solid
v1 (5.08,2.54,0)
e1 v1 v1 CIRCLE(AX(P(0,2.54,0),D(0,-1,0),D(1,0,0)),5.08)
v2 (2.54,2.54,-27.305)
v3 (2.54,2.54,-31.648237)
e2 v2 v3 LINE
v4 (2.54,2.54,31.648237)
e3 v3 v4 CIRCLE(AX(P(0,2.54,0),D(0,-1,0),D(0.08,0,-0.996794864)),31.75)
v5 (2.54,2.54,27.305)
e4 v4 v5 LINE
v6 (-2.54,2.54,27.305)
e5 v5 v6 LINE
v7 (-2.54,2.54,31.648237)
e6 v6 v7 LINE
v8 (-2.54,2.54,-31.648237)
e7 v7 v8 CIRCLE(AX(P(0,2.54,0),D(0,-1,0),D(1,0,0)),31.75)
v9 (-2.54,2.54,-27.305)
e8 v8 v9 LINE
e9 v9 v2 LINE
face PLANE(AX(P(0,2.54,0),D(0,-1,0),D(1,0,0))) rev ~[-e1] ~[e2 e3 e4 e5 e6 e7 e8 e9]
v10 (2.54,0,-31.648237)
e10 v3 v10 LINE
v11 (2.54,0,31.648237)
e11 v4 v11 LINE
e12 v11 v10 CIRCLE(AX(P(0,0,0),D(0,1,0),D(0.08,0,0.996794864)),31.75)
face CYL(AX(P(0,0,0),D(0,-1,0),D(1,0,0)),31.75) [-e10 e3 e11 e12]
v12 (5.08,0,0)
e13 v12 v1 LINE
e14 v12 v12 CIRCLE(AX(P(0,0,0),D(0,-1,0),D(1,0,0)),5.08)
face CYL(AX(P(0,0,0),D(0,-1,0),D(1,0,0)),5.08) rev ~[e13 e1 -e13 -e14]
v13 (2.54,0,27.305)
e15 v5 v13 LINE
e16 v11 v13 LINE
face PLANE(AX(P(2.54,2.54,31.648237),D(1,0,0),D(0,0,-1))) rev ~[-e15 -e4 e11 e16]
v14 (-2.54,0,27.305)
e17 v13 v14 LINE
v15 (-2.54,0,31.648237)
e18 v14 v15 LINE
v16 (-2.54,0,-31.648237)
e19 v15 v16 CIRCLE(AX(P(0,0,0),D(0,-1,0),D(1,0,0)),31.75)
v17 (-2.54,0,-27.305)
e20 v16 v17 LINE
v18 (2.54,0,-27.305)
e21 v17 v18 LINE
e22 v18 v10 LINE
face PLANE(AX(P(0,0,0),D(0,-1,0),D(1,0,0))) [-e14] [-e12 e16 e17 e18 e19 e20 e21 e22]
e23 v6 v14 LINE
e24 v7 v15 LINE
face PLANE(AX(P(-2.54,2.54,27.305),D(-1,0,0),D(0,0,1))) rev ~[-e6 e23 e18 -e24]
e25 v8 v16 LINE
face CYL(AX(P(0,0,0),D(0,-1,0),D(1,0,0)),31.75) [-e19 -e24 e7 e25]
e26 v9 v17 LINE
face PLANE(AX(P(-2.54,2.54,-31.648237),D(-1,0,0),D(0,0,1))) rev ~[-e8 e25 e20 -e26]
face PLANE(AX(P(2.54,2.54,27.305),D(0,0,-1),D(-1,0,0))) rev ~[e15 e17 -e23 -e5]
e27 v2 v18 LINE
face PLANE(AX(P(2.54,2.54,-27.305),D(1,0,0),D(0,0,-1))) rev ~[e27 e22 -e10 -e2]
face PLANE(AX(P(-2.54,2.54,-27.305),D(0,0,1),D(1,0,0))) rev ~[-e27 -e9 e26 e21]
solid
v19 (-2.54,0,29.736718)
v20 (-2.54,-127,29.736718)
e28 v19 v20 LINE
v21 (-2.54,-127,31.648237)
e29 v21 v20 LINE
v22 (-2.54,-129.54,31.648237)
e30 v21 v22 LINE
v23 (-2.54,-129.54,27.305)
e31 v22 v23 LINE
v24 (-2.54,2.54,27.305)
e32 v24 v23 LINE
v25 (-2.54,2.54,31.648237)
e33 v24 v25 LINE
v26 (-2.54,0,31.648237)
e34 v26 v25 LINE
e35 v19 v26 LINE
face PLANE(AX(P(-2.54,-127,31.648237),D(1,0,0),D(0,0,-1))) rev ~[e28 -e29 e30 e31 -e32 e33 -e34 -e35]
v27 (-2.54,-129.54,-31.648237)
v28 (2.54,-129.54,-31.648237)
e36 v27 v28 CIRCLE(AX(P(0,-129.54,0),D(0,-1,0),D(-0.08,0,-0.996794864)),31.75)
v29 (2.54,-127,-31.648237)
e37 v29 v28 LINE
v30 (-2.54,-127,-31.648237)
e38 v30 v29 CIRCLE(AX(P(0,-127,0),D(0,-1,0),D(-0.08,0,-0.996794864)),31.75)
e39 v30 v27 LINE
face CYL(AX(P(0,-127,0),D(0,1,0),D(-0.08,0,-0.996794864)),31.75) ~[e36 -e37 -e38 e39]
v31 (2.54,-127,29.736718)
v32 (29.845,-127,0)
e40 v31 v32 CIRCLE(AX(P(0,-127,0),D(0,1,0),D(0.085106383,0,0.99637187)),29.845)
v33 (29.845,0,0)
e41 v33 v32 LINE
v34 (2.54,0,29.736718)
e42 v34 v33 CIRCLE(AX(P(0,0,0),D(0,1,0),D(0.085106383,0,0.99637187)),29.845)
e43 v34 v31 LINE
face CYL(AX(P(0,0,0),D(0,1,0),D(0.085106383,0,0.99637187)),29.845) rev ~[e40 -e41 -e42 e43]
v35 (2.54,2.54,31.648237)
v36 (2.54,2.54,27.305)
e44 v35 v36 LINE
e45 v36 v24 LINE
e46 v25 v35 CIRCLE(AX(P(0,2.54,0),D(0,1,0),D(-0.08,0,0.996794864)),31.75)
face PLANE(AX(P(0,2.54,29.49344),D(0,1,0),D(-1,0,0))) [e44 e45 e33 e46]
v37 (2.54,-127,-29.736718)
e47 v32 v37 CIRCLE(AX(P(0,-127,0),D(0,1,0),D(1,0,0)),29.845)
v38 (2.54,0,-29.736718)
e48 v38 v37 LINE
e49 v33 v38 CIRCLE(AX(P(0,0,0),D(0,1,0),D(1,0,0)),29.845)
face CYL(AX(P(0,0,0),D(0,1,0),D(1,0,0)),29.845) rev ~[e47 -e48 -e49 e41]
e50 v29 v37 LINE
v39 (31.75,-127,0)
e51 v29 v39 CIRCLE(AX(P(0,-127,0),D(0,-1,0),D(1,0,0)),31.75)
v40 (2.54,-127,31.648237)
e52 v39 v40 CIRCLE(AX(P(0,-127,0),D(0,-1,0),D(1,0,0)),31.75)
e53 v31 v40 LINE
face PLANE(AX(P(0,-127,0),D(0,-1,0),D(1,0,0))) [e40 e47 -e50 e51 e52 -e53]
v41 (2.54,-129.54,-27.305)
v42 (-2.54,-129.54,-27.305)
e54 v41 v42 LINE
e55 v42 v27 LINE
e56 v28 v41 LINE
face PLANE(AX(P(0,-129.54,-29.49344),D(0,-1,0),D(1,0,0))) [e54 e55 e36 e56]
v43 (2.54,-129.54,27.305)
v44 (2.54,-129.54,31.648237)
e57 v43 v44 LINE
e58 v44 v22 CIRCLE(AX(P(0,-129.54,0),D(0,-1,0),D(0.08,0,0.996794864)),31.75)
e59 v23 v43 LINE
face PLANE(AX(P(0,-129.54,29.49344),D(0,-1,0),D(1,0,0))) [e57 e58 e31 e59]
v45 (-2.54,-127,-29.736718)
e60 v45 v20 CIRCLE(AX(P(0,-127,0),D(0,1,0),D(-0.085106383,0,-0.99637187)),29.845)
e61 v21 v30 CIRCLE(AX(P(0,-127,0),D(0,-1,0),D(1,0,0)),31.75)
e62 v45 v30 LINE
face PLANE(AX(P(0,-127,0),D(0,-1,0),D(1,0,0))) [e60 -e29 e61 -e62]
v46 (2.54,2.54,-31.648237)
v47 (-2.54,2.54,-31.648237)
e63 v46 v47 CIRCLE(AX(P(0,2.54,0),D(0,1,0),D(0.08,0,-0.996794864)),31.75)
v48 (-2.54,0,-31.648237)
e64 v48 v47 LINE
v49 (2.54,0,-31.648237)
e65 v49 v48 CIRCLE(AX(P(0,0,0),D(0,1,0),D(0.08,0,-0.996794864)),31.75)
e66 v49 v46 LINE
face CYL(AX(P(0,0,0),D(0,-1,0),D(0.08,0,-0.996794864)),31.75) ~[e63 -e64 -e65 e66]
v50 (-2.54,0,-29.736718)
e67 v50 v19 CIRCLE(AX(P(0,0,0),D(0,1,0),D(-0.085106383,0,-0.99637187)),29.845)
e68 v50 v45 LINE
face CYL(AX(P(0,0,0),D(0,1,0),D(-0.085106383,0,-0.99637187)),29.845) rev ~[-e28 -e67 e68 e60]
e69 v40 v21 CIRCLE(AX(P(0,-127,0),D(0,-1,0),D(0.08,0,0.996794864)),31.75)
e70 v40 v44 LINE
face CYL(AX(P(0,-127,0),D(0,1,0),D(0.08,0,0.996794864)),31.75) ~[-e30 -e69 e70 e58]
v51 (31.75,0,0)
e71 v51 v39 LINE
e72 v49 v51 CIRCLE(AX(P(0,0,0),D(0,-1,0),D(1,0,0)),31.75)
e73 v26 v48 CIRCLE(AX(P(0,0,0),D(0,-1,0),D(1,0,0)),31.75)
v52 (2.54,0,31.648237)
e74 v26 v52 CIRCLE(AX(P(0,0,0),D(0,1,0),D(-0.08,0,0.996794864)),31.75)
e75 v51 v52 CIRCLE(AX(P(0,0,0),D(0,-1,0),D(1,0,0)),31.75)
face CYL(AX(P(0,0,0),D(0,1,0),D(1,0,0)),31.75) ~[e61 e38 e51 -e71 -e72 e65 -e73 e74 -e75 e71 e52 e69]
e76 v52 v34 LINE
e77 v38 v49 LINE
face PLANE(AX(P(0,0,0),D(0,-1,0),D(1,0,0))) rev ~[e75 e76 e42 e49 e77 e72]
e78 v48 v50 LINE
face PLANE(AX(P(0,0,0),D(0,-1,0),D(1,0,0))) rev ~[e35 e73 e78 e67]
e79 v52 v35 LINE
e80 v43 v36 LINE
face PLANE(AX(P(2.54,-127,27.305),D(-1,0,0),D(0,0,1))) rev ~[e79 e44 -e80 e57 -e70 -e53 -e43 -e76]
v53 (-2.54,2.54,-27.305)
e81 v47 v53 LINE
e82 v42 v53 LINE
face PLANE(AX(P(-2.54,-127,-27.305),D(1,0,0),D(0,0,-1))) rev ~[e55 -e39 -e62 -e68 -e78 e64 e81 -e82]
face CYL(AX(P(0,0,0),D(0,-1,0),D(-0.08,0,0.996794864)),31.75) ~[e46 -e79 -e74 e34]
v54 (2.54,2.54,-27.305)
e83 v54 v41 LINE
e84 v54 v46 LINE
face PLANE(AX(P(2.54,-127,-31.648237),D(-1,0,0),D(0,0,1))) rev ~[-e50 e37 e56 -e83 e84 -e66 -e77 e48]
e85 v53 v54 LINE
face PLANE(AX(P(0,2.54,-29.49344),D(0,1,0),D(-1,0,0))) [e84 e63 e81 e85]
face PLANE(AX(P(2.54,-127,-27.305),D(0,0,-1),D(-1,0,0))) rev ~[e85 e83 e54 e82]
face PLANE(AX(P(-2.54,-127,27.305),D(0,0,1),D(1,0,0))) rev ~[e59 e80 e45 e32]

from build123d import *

# Parameters (mm, degrees)
F0_R     = 31.75
F1_DEPTH = 127
F2_R     = 31.75
F2_R_2   = 5.08
F3_DEPTH = 2.54
F5_DEPTH = 2.54
F7_DEPTH = 2.54
F9_DEPTH = 2.54


with BuildPart() as f1:
    # F0 (on Front) → F1 (new body)
    with BuildSketch(Plane.XZ):
        Circle(F0_R)
        with BuildLine():
            ThreePointArc((2.54, 29.7367184639), (21.9832928039, 20.1856102831), (29.845, 0))
            ThreePointArc((29.845, 0), (21.9832928039, -20.1856102831), (2.54, -29.7367184639))
            ThreePointArc((2.54, -29.7367184639), (1.2711535009, -29.817917328), (0, -29.845))
            ThreePointArc((0, -29.845), (-1.2711535009, -29.817917328), (-2.54, -29.7367184639))
            ThreePointArc((-2.54, -29.7367184639), (-29.845, 0), (-2.54, 29.7367184639))
            ThreePointArc((-2.54, 29.7367184639), (-1.2711535009, 29.817917328), (0, 29.845))
            ThreePointArc((0, 29.845), (1.2711535009, 29.817917328), (2.54, 29.7367184639))
        make_face(mode=Mode.SUBTRACT)
        with BuildLine():
            Line((0, 27.305), (0, 29.845))
            ThreePointArc((0, 29.845), (-1.2711535009, 29.817917328), (-2.54, 29.7367184639))
            Line((-2.54, 29.7367184639), (-2.54, 27.305))
            Line((-2.54, 27.305), (0, 27.305))
        make_face()
        with BuildLine():
            Line((2.54, 27.305), (2.54, 29.7367184639))
            ThreePointArc((2.54, 29.7367184639), (1.2711535009, 29.817917328), (0, 29.845))
            Line((0, 29.845), (0, 27.305))
            Line((0, 27.305), (2.54, 27.305))
        make_face()
        with BuildLine():
            ThreePointArc((-2.54, -29.7367184639), (-1.2711535009, -29.817917328), (0, -29.845))
            Line((0, -29.845), (0, -27.305))
            Line((0, -27.305), (-2.54, -27.305))
            Line((-2.54, -27.305), (-2.54, -29.7367184639))
        make_face()
        with BuildLine():
            ThreePointArc((0, -29.845), (1.2711535009, -29.817917328), (2.54, -29.7367184639))
            Line((2.54, -29.7367184639), (2.54, -27.305))
            Line((2.54, -27.305), (0, -27.305))
            Line((0, -27.305), (0, -29.845))
        make_face()
    extrude(amount=F1_DEPTH)

    # F6 (on face) → F7 (join)
    with BuildSketch(Plane(origin=(0, 0, 0), x_dir=(-1, 0, 0), z_dir=(0, 1, 0))):
        with BuildLine():
            Line((-2.54, 29.7367184639), (-2.54, 27.305))
            Line((-2.54, 27.305), (2.54, 27.305))
            Line((2.54, 27.305), (2.54, 29.7367184639))
            Line((2.54, 29.7367184639), (2.54, 31.6482369177))
            ThreePointArc((2.54, 31.6482369177), (0, 31.75), (-2.54, 31.6482369177))
            Line((-2.54, 31.6482369177), (-2.54, 29.7367184639))
        make_face()
        with BuildLine():
            Line((-2.54, -27.305), (-2.54, -29.7367184639))
            Line((-2.54, -29.7367184639), (-2.54, -31.6482369177))
            ThreePointArc((-2.54, -31.6482369177), (0, -31.75), (2.54, -31.6482369177))
            Line((2.54, -31.6482369177), (2.54, -29.7367184639))
            Line((2.54, -29.7367184639), (2.54, -27.305))
            Line((2.54, -27.305), (-2.54, -27.305))
        make_face()
    extrude(amount=F7_DEPTH)

    # F8 (on face) → F9 (join)
    with BuildSketch(Plane.XZ.offset(127)):
        with BuildLine():
            Line((2.54, 29.7367184639), (2.54, 31.6482369177))
            ThreePointArc((2.54, 31.6482369177), (0, 31.75), (-2.54, 31.6482369177))
            Line((-2.54, 31.6482369177), (-2.54, 29.7367184639))
            Line((-2.54, 29.7367184639), (-2.54, 27.305))
            Line((-2.54, 27.305), (2.54, 27.305))
            Line((2.54, 27.305), (2.54, 29.7367184639))
        make_face()
        with BuildLine():
            ThreePointArc((-2.54, -31.6482369177), (0, -31.75), (2.54, -31.6482369177))
            Line((2.54, -31.6482369177), (2.54, -29.7367184639))
            Line((2.54, -29.7367184639), (2.54, -27.305))
            Line((2.54, -27.305), (-2.54, -27.305))
            Line((-2.54, -27.305), (-2.54, -29.7367184639))
            Line((-2.54, -29.7367184639), (-2.54, -31.6482369177))
        make_face()
    extrude(amount=F9_DEPTH)


with BuildPart() as f3:
    # F2 (on Front) → F3 (new body)
    with BuildSketch(Plane.XZ):
        Circle(F2_R)
        Circle(F2_R_2, mode=Mode.SUBTRACT)
    extrude(amount=-F3_DEPTH)

    # F4 (on face) → F5 (cut)
    with BuildSketch(Plane(origin=(0, 2.54, 0), x_dir=(-1, 0, 0), z_dir=(0, 1, 0))):
        with BuildLine():
            ThreePointArc((-2.54, -31.6482369177), (0, -31.75), (2.54, -31.6482369177))
            Line((2.54, -31.6482369177), (2.54, -27.305))
            Line((2.54, -27.305), (0, -27.305))
            Line((0, -27.305), (-2.54, -27.305))
            Line((-2.54, -27.305), (-2.54, -31.6482369177))
        make_face()
        with BuildLine():
            Line((0, 27.305), (0, 31.75))
            ThreePointArc((0, 31.75), (-1.2710188556, 31.7245490286), (-2.54, 31.6482369177))
            Line((-2.54, 31.6482369177), (-2.54, 27.305))
            Line((-2.54, 27.305), (0, 27.305))
        make_face()
        with BuildLine():
            Line((2.54, 27.305), (2.54, 31.6482369177))
            ThreePointArc((2.54, 31.6482369177), (1.2710188556, 31.7245490286), (0, 31.75))
            Line((0, 31.75), (0, 27.305))
            Line((0, 27.305), (2.54, 27.305))
        make_face()
    extrude(amount=-F5_DEPTH, mode=Mode.SUBTRACT)


solid = Compound([f1.part, f3.part])
